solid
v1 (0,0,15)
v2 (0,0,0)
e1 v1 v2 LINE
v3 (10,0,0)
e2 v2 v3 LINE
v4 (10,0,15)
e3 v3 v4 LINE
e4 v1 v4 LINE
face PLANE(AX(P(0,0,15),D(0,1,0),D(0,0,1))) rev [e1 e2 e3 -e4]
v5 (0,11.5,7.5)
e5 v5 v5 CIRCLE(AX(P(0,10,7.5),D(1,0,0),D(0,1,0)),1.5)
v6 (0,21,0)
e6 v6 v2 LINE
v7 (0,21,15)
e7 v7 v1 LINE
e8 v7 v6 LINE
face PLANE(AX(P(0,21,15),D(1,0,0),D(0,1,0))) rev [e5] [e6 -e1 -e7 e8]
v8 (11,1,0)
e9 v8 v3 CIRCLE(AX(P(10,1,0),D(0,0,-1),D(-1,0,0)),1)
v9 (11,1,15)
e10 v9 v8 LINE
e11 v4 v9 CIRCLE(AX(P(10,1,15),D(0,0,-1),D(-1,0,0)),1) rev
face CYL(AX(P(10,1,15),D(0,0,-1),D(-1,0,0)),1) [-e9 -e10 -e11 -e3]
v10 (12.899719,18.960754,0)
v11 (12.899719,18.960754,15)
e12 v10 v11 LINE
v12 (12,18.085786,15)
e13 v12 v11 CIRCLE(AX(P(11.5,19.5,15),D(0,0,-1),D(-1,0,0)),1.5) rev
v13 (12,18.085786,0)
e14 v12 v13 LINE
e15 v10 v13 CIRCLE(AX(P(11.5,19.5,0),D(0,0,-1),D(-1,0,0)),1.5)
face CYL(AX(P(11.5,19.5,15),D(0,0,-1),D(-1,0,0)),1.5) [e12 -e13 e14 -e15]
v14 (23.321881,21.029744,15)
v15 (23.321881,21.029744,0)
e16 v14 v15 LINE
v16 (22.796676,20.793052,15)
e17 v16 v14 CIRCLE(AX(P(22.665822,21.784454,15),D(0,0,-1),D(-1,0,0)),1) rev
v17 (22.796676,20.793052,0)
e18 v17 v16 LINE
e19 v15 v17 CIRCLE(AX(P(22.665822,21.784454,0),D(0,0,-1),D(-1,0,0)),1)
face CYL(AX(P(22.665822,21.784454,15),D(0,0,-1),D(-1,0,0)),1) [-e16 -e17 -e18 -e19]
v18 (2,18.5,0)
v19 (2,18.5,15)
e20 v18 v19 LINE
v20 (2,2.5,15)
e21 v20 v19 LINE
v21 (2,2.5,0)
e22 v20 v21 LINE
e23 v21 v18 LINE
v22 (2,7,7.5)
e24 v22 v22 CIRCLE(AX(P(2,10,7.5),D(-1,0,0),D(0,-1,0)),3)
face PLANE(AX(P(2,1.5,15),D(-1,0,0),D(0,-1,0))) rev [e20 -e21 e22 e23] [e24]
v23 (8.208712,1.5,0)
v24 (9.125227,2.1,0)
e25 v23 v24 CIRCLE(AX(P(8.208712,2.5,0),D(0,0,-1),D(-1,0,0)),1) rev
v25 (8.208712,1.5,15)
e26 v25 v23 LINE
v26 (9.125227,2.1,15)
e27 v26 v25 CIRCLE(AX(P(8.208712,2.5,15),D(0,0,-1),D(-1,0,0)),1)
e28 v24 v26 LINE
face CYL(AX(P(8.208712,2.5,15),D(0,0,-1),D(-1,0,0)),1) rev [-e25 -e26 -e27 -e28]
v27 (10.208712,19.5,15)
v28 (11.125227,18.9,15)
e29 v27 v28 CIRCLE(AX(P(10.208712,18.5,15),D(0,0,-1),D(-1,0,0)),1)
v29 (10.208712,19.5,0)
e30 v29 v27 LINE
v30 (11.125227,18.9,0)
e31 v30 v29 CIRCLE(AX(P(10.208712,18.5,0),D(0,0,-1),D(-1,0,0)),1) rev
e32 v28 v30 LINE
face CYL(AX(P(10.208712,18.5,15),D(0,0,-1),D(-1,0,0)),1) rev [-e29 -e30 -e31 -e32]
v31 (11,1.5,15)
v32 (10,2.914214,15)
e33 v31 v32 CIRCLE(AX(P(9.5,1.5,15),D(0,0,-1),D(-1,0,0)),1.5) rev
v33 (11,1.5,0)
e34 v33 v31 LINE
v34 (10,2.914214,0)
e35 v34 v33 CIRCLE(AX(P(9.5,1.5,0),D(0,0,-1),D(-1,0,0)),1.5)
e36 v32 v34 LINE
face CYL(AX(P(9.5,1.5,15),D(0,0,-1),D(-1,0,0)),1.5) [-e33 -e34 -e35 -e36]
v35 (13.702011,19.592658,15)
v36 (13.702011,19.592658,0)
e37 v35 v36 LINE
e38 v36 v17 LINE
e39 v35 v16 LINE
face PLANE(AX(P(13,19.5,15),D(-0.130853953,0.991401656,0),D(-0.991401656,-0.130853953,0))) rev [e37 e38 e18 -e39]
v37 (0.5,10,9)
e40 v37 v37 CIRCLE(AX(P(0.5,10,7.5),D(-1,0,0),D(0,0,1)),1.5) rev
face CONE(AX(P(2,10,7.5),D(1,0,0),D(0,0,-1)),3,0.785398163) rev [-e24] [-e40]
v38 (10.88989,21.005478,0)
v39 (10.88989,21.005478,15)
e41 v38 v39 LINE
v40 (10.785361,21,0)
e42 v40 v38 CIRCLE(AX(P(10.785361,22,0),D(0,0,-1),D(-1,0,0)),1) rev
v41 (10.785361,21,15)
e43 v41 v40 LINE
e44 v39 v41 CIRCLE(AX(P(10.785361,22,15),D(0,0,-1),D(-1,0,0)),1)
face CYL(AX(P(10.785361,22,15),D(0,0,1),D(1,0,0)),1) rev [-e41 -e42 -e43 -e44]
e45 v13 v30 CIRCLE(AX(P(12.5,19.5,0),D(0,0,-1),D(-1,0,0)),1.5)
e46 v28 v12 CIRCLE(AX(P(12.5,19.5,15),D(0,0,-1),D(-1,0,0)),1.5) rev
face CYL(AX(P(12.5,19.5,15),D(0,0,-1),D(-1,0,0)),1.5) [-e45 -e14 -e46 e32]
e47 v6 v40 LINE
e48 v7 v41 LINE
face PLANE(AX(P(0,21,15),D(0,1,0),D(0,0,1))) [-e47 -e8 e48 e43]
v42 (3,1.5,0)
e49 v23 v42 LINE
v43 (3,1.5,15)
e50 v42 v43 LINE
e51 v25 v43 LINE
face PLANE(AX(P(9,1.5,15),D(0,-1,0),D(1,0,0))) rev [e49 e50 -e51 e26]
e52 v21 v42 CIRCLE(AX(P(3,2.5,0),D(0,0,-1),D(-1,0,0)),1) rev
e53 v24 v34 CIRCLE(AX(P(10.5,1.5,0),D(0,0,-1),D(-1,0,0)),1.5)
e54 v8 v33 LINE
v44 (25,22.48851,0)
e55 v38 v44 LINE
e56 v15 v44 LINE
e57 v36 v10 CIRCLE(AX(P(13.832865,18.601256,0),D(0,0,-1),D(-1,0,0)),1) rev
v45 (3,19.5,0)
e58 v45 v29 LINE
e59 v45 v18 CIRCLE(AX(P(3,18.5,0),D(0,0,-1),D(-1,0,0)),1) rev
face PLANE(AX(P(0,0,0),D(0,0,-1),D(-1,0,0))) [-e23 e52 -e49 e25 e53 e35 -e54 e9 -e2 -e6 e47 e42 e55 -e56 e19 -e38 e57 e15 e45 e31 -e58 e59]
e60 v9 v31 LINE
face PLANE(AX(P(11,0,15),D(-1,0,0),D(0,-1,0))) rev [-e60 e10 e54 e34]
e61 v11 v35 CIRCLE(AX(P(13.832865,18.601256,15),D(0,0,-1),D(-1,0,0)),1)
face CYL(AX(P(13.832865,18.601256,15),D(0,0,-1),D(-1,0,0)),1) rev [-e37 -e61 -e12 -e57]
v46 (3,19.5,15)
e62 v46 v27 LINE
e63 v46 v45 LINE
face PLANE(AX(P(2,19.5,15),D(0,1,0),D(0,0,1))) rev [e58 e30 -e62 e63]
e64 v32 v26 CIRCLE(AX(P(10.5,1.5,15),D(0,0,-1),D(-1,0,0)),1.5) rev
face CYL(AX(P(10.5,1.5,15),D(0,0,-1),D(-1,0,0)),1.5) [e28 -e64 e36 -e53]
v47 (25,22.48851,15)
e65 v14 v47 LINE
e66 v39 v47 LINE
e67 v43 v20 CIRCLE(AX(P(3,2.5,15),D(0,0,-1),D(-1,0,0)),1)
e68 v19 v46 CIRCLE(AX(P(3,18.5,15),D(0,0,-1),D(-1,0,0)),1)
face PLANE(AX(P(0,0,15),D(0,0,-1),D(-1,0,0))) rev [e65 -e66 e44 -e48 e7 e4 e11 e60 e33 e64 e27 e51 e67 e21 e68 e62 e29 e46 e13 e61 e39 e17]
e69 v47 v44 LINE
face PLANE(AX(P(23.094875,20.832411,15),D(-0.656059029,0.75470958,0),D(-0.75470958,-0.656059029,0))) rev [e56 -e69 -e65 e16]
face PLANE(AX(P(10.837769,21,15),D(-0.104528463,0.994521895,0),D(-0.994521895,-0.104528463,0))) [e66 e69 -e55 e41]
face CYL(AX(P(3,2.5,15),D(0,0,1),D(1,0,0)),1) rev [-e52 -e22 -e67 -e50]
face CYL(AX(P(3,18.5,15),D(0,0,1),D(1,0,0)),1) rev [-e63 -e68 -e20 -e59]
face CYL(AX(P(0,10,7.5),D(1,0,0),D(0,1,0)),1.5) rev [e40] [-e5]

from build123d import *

# Parameters (mm, degrees)
BOSS_EXTRUDE1_DEPTH     = 15
CUT_EXTRUDE1_DEPTH      = 36.492719011
CUT_EXTRUDE1_DEPTH_BACK = 36.492719011
SKETCH2_R               = 1.5
CHAMFER1_SIZE           = 1.5
FILLET1_R               = 1.5
FILLET2_R               = 1
FILLET3_R               = 1


with BuildPart() as part:
    # Sketch1 → Boss-Extrude1 (new body)
    with BuildSketch(Plane.XY):
        Polygon((0, 0), (11, 0), (11, 3), (9, 3), (9, 1.5), (2, 1.5), (2, 19.5), (11, 19.5), (11, 18), (13, 18), (13, 19.5), (23.094875358, 20.832410877), (25, 22.488510462), (10.837768967, 21), (0, 21), align=None)
    extrude(amount=BOSS_EXTRUDE1_DEPTH)

    # Sketch2 → Cut-Extrude1 (cut, two sides: drawn at the far end of the back side and taken through both)
    with BuildSketch(Plane(origin=(2, 0, 0), x_dir=(0, 0, -1), z_dir=(1, 0, 0)).offset(-CUT_EXTRUDE1_DEPTH_BACK)):
        with Locations(Location((-7.5, 10, 0), (0, 0, 90))):
            Circle(SKETCH2_R)
    extrude(amount=CUT_EXTRUDE1_DEPTH + CUT_EXTRUDE1_DEPTH_BACK, mode=Mode.SUBTRACT)

    # Chamfer1
    chamfer1_edges = [part.edges().sort_by_distance(p)[0] for p in [
        (2, 8.5, 7.5),
    ]]
    chamfer(chamfer1_edges, length=CHAMFER1_SIZE)

    # Fillet1
    # the kernel refuses this fillet: 1.5 mm, written as the material it takes off along each edge
    with BuildSketch(Plane(origin=(9, 3, -3.75), x_dir=(1, 0, 0), z_dir=(0, 0, 1)), Plane(origin=(11, 3, -3.75), x_dir=(0, -1, 0), z_dir=(0, 0, 1)), Plane(origin=(13, 18, -3.75), x_dir=(-1, 0, 0), z_dir=(0, 0, 1)), Plane(origin=(11, 18, -3.75), x_dir=(0, 1, 0), z_dir=(0, 0, 1))) as fillet1_piece_1:
        with BuildLine():
            CenterArc((FILLET1_R, -FILLET1_R), FILLET1_R, 90, 90)
            Line((0, -FILLET1_R), (0, 0))
            Line((0, 0), (FILLET1_R, 0))
        make_face()
    extrude(amount=22.5, mode=Mode.SUBTRACT)

    # Fillet2
    fillet2_edges = [part.edges().sort_by_distance(p)[0] for p in [
        (2, 1.5, 7.5),
        (11, 0, 7.5),
        (10.837768967, 21, 7.5),
        (23.094875358, 20.832410877, 7.5),
        (2, 19.5, 7.5),
    ]]
    fillet(fillet2_edges, radius=FILLET2_R)

    # Fillet3
    fillet3_edges = [part.edges().sort_by_distance(p)[0] for p in [
        (9, 1.5, 7.5),
        (13, 19.5, 7.5),
        (11, 19.5, 7.5),
    ]]
    fillet(fillet3_edges, radius=FILLET3_R)


solid = part.part
